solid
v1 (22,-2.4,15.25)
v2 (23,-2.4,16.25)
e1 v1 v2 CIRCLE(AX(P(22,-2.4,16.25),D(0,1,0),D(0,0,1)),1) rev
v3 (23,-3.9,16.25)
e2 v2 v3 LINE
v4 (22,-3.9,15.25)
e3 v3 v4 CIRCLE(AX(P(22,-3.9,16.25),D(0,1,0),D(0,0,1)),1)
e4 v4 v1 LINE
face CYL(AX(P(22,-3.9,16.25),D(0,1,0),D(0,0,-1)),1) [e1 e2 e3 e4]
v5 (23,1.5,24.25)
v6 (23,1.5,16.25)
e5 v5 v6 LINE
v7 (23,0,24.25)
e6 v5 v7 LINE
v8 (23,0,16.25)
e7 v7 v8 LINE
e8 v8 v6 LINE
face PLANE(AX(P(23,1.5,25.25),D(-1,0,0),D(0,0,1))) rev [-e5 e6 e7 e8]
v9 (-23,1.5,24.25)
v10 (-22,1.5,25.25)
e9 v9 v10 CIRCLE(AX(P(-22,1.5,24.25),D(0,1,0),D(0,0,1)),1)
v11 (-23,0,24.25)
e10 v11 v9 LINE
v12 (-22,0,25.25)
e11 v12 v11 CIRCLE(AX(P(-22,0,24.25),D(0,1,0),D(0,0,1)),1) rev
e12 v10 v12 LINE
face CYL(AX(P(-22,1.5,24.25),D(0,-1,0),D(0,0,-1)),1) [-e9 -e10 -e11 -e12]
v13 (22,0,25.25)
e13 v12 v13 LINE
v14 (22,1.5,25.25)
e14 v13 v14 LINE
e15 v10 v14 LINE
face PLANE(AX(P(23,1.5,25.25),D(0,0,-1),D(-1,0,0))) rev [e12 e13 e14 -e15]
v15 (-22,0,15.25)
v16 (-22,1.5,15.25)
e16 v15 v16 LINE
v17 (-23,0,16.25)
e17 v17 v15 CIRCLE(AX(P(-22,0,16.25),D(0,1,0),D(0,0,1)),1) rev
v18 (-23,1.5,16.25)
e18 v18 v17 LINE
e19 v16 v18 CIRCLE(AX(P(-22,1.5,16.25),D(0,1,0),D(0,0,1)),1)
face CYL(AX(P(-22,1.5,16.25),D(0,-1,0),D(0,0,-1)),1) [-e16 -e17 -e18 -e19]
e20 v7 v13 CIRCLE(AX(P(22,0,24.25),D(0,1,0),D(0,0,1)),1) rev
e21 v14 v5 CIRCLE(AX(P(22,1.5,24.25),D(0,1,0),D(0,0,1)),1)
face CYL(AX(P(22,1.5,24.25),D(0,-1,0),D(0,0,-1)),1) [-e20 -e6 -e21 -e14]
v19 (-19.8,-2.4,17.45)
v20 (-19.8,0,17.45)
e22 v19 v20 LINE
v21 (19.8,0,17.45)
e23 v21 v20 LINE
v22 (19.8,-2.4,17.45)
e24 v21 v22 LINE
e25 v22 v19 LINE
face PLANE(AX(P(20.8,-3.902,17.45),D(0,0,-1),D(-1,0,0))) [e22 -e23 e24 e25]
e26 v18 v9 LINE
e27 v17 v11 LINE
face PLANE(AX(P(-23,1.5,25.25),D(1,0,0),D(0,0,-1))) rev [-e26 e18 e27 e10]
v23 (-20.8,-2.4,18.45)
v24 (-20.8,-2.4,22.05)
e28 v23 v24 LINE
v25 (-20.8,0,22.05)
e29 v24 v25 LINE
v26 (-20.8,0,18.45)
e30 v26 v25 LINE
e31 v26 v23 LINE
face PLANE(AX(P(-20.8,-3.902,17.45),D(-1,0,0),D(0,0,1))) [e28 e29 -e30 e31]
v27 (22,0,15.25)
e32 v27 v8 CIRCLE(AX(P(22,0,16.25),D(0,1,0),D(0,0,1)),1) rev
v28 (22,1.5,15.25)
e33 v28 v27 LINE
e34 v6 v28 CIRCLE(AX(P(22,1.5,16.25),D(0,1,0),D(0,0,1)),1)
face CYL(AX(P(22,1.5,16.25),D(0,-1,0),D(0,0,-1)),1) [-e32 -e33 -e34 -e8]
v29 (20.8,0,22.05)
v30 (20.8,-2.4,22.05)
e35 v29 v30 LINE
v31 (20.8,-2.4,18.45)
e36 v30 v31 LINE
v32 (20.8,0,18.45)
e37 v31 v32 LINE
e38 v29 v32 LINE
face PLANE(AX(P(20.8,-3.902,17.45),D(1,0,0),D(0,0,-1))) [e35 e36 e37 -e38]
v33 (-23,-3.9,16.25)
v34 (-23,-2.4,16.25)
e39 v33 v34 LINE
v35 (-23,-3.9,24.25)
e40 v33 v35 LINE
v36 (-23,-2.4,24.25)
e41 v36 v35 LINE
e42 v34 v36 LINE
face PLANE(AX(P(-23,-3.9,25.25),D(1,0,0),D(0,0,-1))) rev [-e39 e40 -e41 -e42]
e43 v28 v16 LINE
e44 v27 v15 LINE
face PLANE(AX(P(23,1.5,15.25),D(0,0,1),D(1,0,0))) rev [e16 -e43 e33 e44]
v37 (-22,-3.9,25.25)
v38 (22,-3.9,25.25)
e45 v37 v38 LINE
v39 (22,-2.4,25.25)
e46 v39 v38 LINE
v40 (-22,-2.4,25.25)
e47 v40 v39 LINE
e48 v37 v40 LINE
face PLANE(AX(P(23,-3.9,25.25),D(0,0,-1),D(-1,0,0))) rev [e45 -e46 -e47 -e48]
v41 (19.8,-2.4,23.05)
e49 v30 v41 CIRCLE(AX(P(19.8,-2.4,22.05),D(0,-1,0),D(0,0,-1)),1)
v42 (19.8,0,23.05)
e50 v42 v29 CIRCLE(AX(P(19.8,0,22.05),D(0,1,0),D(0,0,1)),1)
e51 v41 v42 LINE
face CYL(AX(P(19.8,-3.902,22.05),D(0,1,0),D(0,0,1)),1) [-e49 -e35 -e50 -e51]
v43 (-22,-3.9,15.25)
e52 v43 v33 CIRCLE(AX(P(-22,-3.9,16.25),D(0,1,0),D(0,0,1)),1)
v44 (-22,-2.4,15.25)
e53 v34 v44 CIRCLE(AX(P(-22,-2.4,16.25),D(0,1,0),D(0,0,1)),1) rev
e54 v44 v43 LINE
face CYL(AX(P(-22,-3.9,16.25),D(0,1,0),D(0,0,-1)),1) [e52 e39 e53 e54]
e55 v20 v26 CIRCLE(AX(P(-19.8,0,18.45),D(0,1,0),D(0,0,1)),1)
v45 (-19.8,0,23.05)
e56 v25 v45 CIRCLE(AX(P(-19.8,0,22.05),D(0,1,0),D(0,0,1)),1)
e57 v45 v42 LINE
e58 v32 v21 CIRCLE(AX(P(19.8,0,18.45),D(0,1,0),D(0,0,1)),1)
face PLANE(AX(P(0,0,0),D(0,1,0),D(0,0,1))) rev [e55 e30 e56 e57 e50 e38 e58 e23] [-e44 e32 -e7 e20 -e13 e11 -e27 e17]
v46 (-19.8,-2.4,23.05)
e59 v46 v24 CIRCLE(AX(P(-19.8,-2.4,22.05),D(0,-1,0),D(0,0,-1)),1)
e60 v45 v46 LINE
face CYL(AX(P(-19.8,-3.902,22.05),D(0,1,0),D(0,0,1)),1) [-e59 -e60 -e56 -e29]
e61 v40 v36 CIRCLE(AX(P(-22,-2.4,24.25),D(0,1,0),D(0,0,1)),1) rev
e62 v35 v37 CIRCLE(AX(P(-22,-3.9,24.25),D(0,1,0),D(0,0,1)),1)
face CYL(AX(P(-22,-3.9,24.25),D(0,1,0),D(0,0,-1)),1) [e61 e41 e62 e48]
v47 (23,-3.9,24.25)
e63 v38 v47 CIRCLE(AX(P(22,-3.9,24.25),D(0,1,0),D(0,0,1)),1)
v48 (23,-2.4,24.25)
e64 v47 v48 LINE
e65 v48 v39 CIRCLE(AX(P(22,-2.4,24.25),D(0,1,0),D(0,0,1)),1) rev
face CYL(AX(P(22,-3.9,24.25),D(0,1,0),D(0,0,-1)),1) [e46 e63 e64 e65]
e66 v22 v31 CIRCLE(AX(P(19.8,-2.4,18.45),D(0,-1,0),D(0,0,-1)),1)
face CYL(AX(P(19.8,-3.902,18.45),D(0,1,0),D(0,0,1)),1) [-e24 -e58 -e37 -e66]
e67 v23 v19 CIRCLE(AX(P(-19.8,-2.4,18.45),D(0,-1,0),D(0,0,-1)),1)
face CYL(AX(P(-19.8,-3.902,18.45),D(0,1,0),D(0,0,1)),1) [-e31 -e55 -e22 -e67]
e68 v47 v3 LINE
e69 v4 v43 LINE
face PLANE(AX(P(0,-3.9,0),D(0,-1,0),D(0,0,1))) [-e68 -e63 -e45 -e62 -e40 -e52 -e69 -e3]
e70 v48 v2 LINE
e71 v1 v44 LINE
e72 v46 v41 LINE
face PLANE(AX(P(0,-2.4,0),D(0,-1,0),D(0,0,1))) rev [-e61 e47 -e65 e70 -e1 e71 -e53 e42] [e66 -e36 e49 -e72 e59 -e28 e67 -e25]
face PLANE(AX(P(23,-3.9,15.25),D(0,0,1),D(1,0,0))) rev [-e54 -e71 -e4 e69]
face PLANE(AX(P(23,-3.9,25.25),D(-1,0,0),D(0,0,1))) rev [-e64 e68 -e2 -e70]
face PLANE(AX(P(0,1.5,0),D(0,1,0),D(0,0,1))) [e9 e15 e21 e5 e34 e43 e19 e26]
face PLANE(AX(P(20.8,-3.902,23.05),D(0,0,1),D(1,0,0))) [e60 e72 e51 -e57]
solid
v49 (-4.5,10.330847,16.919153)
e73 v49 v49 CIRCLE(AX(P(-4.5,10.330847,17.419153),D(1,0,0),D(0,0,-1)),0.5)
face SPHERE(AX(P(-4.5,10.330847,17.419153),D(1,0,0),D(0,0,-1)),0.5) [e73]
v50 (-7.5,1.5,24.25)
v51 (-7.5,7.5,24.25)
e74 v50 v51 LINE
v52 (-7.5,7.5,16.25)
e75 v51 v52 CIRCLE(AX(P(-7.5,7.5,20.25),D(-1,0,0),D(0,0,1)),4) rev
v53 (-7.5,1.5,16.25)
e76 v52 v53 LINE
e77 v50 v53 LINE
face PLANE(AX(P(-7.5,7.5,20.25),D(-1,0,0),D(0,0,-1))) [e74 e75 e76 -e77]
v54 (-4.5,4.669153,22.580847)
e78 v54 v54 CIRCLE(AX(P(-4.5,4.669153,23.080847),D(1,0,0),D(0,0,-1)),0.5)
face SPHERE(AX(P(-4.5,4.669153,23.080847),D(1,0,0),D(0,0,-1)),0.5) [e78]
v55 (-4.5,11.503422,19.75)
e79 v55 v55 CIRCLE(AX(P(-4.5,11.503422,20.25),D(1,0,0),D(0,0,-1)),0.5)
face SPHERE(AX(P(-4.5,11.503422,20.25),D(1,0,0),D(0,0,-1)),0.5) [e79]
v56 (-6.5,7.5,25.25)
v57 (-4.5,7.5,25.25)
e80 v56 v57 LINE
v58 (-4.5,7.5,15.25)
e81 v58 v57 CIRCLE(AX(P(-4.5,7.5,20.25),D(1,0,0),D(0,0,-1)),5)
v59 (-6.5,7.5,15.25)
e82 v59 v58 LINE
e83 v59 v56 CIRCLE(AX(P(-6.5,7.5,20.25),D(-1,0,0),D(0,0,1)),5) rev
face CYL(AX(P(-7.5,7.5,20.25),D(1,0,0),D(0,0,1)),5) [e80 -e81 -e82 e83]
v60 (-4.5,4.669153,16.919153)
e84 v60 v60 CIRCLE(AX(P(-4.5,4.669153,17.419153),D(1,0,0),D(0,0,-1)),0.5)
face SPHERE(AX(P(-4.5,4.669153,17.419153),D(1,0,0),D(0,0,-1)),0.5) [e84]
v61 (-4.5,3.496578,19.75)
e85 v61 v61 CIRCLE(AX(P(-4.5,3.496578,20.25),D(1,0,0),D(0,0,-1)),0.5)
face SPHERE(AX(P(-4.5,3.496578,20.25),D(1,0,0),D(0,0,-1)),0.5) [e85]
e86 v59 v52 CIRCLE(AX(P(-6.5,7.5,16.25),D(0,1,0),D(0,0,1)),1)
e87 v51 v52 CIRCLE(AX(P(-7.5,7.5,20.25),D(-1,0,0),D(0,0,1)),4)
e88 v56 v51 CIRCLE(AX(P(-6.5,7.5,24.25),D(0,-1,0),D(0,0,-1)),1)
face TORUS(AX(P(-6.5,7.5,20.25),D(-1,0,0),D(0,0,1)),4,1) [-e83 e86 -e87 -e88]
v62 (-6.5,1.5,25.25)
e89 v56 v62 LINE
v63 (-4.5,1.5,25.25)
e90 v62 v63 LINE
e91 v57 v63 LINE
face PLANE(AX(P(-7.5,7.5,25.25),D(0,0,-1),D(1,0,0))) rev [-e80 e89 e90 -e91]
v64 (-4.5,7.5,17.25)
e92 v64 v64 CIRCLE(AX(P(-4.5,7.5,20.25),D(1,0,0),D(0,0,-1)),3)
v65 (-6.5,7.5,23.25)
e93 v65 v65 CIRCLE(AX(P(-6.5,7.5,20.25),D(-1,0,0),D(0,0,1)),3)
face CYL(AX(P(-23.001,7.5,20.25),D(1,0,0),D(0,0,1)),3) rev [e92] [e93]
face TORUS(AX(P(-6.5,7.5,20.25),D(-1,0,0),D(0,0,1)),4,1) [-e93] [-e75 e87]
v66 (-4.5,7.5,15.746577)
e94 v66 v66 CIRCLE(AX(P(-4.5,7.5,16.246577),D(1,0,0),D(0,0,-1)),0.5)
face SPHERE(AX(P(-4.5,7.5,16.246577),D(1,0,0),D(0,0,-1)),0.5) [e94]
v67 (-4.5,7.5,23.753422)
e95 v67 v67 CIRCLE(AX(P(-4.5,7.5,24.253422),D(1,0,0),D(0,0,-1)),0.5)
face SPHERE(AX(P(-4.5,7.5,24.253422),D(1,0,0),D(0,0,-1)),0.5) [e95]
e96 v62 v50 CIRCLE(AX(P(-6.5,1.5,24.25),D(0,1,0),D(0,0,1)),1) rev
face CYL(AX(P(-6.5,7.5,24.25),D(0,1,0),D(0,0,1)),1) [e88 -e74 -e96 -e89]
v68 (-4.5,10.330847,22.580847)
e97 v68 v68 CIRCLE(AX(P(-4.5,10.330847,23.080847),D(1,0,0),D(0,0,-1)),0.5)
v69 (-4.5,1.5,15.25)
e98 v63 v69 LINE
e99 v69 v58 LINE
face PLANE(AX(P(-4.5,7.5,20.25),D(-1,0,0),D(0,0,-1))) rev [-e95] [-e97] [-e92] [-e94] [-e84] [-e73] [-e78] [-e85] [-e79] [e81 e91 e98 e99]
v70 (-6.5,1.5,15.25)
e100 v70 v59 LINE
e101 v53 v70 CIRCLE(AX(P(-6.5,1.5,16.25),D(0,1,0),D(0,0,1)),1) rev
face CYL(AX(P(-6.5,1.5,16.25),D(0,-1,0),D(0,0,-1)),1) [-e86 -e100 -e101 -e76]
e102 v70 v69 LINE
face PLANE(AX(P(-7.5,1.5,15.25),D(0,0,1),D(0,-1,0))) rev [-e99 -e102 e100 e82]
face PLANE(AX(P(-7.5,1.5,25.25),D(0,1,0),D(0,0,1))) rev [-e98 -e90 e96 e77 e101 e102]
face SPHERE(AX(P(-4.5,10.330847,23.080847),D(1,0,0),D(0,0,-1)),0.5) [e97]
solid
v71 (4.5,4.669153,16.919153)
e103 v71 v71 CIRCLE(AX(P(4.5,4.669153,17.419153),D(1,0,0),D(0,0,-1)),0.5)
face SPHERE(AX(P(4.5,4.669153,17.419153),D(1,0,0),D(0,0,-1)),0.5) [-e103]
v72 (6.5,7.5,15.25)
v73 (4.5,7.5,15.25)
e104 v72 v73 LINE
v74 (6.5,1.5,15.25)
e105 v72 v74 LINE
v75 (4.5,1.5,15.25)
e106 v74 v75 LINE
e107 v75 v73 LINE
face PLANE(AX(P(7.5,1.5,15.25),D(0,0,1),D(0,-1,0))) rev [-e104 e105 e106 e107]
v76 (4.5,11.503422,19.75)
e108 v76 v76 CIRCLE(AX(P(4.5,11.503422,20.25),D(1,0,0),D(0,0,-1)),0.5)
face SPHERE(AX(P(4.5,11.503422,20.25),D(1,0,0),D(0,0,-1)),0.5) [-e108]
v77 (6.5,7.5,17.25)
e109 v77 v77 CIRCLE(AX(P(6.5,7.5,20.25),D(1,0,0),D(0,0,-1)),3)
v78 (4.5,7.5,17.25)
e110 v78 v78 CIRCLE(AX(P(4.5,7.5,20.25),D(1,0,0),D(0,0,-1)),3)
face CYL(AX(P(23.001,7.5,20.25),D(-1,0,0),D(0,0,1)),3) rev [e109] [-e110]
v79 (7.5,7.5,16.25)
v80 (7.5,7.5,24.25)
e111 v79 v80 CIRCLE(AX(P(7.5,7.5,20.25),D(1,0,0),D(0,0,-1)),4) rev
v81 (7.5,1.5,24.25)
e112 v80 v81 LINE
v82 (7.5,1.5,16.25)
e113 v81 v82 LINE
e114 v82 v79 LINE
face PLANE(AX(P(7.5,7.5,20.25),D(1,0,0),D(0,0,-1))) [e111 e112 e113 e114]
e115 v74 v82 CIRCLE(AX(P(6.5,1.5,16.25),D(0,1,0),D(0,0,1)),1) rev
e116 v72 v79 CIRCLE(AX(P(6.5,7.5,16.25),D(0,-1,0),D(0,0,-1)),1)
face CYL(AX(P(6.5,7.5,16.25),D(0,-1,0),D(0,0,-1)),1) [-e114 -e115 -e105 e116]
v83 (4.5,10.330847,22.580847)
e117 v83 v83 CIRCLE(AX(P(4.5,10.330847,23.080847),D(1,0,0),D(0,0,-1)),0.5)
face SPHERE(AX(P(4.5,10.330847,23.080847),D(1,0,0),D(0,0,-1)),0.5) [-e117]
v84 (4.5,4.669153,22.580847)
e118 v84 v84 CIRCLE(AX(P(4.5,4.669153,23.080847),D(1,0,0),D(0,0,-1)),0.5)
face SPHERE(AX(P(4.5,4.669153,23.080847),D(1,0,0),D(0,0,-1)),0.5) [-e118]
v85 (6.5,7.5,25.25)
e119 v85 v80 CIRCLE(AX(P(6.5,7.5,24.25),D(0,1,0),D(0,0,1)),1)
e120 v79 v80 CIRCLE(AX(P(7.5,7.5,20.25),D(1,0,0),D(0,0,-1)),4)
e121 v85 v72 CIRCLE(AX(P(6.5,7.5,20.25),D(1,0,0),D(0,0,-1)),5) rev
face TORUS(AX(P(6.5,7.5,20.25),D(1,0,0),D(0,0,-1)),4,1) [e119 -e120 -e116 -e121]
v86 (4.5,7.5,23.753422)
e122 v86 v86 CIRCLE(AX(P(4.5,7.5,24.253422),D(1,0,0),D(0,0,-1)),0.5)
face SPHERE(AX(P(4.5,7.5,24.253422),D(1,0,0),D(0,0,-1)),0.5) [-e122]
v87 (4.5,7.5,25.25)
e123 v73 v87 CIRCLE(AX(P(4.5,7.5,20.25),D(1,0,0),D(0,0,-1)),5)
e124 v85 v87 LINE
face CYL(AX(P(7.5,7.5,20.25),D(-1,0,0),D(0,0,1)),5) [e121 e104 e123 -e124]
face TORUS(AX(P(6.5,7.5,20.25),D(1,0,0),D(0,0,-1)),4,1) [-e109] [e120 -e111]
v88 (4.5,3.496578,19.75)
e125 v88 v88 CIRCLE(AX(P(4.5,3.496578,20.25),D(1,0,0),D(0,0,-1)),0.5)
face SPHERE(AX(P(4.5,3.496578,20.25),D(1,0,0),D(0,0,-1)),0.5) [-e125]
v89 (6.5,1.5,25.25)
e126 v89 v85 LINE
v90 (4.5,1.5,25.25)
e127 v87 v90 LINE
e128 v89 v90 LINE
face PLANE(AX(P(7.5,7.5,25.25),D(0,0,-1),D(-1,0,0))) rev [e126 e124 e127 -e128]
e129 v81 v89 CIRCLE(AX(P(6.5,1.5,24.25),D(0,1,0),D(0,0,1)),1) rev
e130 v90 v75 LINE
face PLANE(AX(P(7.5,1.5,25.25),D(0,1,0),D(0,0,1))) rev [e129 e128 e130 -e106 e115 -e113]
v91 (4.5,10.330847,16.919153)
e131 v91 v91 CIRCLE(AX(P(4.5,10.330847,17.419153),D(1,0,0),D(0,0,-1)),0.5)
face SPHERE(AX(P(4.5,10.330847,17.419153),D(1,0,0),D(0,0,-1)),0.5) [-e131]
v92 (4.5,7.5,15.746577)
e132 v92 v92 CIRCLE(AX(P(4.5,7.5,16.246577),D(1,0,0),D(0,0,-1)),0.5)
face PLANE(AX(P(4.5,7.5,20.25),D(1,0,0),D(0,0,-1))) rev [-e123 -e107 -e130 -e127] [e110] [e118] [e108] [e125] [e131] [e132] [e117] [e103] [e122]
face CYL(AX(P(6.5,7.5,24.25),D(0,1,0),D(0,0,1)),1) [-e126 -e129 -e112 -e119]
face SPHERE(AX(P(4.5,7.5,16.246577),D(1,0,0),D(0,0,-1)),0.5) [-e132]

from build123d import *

# Parameters (mm, degrees)
SKETCH1_W           = 46
SKETCH1_H           = 10
BOSS_EXTRUDE1_DEPTH = 1.5
FILLET6_R           = 1
BOSS_EXTRUDE2_REACH = 36.377
SKETCH2_W           = 41.6
SKETCH2_H           = 5.6
BOSS_EXTRUDE4_DEPTH = 3
CUT_EXTRUDE1_START  = 4.5
SKETCH5_R           = 3
CUT_EXTRUDE1_DEPTH  = 3
CIRPATTERN1_COUNT   = 8
FILLET1_R           = 1
FILLET2_R           = 1
FILLET3_R           = 1
FILLET4_R           = 1
FILLET5_R           = 1


with BuildPart() as part:
    # Sketch1 → Boss-Extrude1 (new body)
    with BuildSketch(Plane(origin=(0, 0, 0), x_dir=(1, 0, 0), z_dir=(0, 1, 0))):
        with Locations((0, -20.249999594)):
            Rectangle(SKETCH1_W, SKETCH1_H)
    extrude(amount=BOSS_EXTRUDE1_DEPTH)

    # Fillet6
    fillet6_edges = [part.edges().sort_by_distance(p)[0] for p in [
        (23, 0.75, 25.249999594),
        (-23, 0.75, 25.249999594),
        (-23, 0.75, 15.249999594),
        (23, 0.75, 15.249999594),
    ]]
    fillet(fillet6_edges, radius=FILLET6_R)


with BuildPart() as body_2:
    # Mirror2: mirrored copy
    add(part.part.mirror(Plane.ZX.offset(-1.2)))

    # Sketch2 → Boss-Extrude2 (add, up to next)
    with BuildSketch(Plane(origin=(0, 0, 0), x_dir=(1, 0, 0), z_dir=(0, 1, 0)), mode=Mode.PRIVATE) as boss_extrude2_sk1:
        with Locations((0, -20.249999594)):
            Rectangle(SKETCH2_W, SKETCH2_H)
    boss_extrude2_tool1 = extrude(boss_extrude2_sk1.sketch, amount=-BOSS_EXTRUDE2_REACH, mode=Mode.PRIVATE) - body_2.part

    add(part.part)  # Boss-Extrude2 merges part
    add(boss_extrude2_tool1.solids().sort_by_distance((0, 0, 20.25))[0])

    # Fillet1
    fillet1_edges = [body_2.edges().sort_by_distance(p)[0] for p in [
        (-20.8, -1.2, 17.449999594),
        (20.8, -1.2, 17.449999594),
        (-20.8, -1.2, 23.049999594),
        (20.8, -1.2, 23.049999594),
    ]]
    fillet(fillet1_edges, radius=FILLET1_R)


with BuildPart() as body_2_2:
    # Sketch3 → Boss-Extrude4 (new body)
    with BuildSketch(Plane(origin=(4.5, 0, 0), x_dir=(0, 0, -1), z_dir=(1, 0, 0))):
        with BuildLine():
            Line((-25.249999594, 7.5), (-25.249999594, 1.5))
            Line((-25.249999594, 1.5), (-15.249999594, 1.5))
            Line((-15.249999594, 1.5), (-15.249999594, 7.5))
            ThreePointArc((-15.249999594, 7.5), (-20.249999594, 12.5), (-25.249999594, 7.5))
        make_face()
    extrude(amount=BOSS_EXTRUDE4_DEPTH)

    # Sketch5 → Cut-Extrude1 (cut)
    with BuildSketch(Plane(origin=(0, 0, 0), x_dir=(0, 0, -1), z_dir=(1, 0, 0)).offset(CUT_EXTRUDE1_START)):
        with Locations((-20.249999594, 7.5)):
            Circle(SKETCH5_R)
    extrude(amount=CUT_EXTRUDE1_DEPTH, mode=Mode.SUBTRACT)

    # Sketch4 → Revolve1 (revolve)
    with BuildSketch(Plane(origin=(4.5, 0, 0), x_dir=(0, 0, -1), z_dir=(1, 0, 0))):
        with BuildLine():
            Line((-20.249999594, 11.003422268), (-20.249999594, 12.003422268))
            ThreePointArc((-20.249999594, 12.003422268), (-19.749999594, 11.503422268), (-20.249999594, 11.003422268))
        make_face()
    revolve1 = revolve(axis=Axis((4.5, 6.41783205, 20.249999594), (0, 1, 0)))

    # CirPattern1: Revolve1 ×8 about axis
    cirpattern1_axis = Axis((0, 7.5, 20.249999594), (1, 0, 0))
    for i in range(1, CIRPATTERN1_COUNT):
        add(revolve1.rotate(cirpattern1_axis, i * 360 / CIRPATTERN1_COUNT))


with BuildPart() as body_3:
    # Mirror4: mirrored copy
    add(body_2_2.part.mirror(Plane(origin=(0, 0, 0), x_dir=(0, 0, 1), z_dir=(1, 0, 0))))

    # Fillet4
    fillet4_edges = [body_3.edges().sort_by_distance(p)[0] for p in [
        (-7.5, 4.5, 15.249999594),
        (-7.5, 12.5, 20.249999594),
        (-7.5, 4.5, 25.249999594),
    ]]
    fillet(fillet4_edges, radius=FILLET4_R)

    # Fillet5
    fillet5_edges = [body_3.edges().sort_by_distance(p)[0] for p in [
        (-7.5, 7.5, 23.249999594),
    ]]
    fillet(fillet5_edges, radius=FILLET5_R - 0.0001)  # a hair under: the kernel refuses the full size


with BuildPart() as body_2_2_1:
    add(body_2_2.part)

    # Fillet2
    fillet2_edges = [body_2_2_1.edges().sort_by_distance(p)[0] for p in [
        (7.5, 4.5, 15.249999594),
        (7.5, 12.5, 20.249999594),
        (7.5, 4.5, 25.249999594),
    ]]
    fillet(fillet2_edges, radius=FILLET2_R)

    # Fillet3
    fillet3_edges = [body_2_2_1.edges().sort_by_distance(p)[0] for p in [
        (7.5, 7.5, 23.249999594),
    ]]
    fillet(fillet3_edges, radius=FILLET3_R - 0.0001)  # a hair under: the kernel refuses the full size


solid = Compound([body_2.part, body_3.part, body_2_2_1.part])
